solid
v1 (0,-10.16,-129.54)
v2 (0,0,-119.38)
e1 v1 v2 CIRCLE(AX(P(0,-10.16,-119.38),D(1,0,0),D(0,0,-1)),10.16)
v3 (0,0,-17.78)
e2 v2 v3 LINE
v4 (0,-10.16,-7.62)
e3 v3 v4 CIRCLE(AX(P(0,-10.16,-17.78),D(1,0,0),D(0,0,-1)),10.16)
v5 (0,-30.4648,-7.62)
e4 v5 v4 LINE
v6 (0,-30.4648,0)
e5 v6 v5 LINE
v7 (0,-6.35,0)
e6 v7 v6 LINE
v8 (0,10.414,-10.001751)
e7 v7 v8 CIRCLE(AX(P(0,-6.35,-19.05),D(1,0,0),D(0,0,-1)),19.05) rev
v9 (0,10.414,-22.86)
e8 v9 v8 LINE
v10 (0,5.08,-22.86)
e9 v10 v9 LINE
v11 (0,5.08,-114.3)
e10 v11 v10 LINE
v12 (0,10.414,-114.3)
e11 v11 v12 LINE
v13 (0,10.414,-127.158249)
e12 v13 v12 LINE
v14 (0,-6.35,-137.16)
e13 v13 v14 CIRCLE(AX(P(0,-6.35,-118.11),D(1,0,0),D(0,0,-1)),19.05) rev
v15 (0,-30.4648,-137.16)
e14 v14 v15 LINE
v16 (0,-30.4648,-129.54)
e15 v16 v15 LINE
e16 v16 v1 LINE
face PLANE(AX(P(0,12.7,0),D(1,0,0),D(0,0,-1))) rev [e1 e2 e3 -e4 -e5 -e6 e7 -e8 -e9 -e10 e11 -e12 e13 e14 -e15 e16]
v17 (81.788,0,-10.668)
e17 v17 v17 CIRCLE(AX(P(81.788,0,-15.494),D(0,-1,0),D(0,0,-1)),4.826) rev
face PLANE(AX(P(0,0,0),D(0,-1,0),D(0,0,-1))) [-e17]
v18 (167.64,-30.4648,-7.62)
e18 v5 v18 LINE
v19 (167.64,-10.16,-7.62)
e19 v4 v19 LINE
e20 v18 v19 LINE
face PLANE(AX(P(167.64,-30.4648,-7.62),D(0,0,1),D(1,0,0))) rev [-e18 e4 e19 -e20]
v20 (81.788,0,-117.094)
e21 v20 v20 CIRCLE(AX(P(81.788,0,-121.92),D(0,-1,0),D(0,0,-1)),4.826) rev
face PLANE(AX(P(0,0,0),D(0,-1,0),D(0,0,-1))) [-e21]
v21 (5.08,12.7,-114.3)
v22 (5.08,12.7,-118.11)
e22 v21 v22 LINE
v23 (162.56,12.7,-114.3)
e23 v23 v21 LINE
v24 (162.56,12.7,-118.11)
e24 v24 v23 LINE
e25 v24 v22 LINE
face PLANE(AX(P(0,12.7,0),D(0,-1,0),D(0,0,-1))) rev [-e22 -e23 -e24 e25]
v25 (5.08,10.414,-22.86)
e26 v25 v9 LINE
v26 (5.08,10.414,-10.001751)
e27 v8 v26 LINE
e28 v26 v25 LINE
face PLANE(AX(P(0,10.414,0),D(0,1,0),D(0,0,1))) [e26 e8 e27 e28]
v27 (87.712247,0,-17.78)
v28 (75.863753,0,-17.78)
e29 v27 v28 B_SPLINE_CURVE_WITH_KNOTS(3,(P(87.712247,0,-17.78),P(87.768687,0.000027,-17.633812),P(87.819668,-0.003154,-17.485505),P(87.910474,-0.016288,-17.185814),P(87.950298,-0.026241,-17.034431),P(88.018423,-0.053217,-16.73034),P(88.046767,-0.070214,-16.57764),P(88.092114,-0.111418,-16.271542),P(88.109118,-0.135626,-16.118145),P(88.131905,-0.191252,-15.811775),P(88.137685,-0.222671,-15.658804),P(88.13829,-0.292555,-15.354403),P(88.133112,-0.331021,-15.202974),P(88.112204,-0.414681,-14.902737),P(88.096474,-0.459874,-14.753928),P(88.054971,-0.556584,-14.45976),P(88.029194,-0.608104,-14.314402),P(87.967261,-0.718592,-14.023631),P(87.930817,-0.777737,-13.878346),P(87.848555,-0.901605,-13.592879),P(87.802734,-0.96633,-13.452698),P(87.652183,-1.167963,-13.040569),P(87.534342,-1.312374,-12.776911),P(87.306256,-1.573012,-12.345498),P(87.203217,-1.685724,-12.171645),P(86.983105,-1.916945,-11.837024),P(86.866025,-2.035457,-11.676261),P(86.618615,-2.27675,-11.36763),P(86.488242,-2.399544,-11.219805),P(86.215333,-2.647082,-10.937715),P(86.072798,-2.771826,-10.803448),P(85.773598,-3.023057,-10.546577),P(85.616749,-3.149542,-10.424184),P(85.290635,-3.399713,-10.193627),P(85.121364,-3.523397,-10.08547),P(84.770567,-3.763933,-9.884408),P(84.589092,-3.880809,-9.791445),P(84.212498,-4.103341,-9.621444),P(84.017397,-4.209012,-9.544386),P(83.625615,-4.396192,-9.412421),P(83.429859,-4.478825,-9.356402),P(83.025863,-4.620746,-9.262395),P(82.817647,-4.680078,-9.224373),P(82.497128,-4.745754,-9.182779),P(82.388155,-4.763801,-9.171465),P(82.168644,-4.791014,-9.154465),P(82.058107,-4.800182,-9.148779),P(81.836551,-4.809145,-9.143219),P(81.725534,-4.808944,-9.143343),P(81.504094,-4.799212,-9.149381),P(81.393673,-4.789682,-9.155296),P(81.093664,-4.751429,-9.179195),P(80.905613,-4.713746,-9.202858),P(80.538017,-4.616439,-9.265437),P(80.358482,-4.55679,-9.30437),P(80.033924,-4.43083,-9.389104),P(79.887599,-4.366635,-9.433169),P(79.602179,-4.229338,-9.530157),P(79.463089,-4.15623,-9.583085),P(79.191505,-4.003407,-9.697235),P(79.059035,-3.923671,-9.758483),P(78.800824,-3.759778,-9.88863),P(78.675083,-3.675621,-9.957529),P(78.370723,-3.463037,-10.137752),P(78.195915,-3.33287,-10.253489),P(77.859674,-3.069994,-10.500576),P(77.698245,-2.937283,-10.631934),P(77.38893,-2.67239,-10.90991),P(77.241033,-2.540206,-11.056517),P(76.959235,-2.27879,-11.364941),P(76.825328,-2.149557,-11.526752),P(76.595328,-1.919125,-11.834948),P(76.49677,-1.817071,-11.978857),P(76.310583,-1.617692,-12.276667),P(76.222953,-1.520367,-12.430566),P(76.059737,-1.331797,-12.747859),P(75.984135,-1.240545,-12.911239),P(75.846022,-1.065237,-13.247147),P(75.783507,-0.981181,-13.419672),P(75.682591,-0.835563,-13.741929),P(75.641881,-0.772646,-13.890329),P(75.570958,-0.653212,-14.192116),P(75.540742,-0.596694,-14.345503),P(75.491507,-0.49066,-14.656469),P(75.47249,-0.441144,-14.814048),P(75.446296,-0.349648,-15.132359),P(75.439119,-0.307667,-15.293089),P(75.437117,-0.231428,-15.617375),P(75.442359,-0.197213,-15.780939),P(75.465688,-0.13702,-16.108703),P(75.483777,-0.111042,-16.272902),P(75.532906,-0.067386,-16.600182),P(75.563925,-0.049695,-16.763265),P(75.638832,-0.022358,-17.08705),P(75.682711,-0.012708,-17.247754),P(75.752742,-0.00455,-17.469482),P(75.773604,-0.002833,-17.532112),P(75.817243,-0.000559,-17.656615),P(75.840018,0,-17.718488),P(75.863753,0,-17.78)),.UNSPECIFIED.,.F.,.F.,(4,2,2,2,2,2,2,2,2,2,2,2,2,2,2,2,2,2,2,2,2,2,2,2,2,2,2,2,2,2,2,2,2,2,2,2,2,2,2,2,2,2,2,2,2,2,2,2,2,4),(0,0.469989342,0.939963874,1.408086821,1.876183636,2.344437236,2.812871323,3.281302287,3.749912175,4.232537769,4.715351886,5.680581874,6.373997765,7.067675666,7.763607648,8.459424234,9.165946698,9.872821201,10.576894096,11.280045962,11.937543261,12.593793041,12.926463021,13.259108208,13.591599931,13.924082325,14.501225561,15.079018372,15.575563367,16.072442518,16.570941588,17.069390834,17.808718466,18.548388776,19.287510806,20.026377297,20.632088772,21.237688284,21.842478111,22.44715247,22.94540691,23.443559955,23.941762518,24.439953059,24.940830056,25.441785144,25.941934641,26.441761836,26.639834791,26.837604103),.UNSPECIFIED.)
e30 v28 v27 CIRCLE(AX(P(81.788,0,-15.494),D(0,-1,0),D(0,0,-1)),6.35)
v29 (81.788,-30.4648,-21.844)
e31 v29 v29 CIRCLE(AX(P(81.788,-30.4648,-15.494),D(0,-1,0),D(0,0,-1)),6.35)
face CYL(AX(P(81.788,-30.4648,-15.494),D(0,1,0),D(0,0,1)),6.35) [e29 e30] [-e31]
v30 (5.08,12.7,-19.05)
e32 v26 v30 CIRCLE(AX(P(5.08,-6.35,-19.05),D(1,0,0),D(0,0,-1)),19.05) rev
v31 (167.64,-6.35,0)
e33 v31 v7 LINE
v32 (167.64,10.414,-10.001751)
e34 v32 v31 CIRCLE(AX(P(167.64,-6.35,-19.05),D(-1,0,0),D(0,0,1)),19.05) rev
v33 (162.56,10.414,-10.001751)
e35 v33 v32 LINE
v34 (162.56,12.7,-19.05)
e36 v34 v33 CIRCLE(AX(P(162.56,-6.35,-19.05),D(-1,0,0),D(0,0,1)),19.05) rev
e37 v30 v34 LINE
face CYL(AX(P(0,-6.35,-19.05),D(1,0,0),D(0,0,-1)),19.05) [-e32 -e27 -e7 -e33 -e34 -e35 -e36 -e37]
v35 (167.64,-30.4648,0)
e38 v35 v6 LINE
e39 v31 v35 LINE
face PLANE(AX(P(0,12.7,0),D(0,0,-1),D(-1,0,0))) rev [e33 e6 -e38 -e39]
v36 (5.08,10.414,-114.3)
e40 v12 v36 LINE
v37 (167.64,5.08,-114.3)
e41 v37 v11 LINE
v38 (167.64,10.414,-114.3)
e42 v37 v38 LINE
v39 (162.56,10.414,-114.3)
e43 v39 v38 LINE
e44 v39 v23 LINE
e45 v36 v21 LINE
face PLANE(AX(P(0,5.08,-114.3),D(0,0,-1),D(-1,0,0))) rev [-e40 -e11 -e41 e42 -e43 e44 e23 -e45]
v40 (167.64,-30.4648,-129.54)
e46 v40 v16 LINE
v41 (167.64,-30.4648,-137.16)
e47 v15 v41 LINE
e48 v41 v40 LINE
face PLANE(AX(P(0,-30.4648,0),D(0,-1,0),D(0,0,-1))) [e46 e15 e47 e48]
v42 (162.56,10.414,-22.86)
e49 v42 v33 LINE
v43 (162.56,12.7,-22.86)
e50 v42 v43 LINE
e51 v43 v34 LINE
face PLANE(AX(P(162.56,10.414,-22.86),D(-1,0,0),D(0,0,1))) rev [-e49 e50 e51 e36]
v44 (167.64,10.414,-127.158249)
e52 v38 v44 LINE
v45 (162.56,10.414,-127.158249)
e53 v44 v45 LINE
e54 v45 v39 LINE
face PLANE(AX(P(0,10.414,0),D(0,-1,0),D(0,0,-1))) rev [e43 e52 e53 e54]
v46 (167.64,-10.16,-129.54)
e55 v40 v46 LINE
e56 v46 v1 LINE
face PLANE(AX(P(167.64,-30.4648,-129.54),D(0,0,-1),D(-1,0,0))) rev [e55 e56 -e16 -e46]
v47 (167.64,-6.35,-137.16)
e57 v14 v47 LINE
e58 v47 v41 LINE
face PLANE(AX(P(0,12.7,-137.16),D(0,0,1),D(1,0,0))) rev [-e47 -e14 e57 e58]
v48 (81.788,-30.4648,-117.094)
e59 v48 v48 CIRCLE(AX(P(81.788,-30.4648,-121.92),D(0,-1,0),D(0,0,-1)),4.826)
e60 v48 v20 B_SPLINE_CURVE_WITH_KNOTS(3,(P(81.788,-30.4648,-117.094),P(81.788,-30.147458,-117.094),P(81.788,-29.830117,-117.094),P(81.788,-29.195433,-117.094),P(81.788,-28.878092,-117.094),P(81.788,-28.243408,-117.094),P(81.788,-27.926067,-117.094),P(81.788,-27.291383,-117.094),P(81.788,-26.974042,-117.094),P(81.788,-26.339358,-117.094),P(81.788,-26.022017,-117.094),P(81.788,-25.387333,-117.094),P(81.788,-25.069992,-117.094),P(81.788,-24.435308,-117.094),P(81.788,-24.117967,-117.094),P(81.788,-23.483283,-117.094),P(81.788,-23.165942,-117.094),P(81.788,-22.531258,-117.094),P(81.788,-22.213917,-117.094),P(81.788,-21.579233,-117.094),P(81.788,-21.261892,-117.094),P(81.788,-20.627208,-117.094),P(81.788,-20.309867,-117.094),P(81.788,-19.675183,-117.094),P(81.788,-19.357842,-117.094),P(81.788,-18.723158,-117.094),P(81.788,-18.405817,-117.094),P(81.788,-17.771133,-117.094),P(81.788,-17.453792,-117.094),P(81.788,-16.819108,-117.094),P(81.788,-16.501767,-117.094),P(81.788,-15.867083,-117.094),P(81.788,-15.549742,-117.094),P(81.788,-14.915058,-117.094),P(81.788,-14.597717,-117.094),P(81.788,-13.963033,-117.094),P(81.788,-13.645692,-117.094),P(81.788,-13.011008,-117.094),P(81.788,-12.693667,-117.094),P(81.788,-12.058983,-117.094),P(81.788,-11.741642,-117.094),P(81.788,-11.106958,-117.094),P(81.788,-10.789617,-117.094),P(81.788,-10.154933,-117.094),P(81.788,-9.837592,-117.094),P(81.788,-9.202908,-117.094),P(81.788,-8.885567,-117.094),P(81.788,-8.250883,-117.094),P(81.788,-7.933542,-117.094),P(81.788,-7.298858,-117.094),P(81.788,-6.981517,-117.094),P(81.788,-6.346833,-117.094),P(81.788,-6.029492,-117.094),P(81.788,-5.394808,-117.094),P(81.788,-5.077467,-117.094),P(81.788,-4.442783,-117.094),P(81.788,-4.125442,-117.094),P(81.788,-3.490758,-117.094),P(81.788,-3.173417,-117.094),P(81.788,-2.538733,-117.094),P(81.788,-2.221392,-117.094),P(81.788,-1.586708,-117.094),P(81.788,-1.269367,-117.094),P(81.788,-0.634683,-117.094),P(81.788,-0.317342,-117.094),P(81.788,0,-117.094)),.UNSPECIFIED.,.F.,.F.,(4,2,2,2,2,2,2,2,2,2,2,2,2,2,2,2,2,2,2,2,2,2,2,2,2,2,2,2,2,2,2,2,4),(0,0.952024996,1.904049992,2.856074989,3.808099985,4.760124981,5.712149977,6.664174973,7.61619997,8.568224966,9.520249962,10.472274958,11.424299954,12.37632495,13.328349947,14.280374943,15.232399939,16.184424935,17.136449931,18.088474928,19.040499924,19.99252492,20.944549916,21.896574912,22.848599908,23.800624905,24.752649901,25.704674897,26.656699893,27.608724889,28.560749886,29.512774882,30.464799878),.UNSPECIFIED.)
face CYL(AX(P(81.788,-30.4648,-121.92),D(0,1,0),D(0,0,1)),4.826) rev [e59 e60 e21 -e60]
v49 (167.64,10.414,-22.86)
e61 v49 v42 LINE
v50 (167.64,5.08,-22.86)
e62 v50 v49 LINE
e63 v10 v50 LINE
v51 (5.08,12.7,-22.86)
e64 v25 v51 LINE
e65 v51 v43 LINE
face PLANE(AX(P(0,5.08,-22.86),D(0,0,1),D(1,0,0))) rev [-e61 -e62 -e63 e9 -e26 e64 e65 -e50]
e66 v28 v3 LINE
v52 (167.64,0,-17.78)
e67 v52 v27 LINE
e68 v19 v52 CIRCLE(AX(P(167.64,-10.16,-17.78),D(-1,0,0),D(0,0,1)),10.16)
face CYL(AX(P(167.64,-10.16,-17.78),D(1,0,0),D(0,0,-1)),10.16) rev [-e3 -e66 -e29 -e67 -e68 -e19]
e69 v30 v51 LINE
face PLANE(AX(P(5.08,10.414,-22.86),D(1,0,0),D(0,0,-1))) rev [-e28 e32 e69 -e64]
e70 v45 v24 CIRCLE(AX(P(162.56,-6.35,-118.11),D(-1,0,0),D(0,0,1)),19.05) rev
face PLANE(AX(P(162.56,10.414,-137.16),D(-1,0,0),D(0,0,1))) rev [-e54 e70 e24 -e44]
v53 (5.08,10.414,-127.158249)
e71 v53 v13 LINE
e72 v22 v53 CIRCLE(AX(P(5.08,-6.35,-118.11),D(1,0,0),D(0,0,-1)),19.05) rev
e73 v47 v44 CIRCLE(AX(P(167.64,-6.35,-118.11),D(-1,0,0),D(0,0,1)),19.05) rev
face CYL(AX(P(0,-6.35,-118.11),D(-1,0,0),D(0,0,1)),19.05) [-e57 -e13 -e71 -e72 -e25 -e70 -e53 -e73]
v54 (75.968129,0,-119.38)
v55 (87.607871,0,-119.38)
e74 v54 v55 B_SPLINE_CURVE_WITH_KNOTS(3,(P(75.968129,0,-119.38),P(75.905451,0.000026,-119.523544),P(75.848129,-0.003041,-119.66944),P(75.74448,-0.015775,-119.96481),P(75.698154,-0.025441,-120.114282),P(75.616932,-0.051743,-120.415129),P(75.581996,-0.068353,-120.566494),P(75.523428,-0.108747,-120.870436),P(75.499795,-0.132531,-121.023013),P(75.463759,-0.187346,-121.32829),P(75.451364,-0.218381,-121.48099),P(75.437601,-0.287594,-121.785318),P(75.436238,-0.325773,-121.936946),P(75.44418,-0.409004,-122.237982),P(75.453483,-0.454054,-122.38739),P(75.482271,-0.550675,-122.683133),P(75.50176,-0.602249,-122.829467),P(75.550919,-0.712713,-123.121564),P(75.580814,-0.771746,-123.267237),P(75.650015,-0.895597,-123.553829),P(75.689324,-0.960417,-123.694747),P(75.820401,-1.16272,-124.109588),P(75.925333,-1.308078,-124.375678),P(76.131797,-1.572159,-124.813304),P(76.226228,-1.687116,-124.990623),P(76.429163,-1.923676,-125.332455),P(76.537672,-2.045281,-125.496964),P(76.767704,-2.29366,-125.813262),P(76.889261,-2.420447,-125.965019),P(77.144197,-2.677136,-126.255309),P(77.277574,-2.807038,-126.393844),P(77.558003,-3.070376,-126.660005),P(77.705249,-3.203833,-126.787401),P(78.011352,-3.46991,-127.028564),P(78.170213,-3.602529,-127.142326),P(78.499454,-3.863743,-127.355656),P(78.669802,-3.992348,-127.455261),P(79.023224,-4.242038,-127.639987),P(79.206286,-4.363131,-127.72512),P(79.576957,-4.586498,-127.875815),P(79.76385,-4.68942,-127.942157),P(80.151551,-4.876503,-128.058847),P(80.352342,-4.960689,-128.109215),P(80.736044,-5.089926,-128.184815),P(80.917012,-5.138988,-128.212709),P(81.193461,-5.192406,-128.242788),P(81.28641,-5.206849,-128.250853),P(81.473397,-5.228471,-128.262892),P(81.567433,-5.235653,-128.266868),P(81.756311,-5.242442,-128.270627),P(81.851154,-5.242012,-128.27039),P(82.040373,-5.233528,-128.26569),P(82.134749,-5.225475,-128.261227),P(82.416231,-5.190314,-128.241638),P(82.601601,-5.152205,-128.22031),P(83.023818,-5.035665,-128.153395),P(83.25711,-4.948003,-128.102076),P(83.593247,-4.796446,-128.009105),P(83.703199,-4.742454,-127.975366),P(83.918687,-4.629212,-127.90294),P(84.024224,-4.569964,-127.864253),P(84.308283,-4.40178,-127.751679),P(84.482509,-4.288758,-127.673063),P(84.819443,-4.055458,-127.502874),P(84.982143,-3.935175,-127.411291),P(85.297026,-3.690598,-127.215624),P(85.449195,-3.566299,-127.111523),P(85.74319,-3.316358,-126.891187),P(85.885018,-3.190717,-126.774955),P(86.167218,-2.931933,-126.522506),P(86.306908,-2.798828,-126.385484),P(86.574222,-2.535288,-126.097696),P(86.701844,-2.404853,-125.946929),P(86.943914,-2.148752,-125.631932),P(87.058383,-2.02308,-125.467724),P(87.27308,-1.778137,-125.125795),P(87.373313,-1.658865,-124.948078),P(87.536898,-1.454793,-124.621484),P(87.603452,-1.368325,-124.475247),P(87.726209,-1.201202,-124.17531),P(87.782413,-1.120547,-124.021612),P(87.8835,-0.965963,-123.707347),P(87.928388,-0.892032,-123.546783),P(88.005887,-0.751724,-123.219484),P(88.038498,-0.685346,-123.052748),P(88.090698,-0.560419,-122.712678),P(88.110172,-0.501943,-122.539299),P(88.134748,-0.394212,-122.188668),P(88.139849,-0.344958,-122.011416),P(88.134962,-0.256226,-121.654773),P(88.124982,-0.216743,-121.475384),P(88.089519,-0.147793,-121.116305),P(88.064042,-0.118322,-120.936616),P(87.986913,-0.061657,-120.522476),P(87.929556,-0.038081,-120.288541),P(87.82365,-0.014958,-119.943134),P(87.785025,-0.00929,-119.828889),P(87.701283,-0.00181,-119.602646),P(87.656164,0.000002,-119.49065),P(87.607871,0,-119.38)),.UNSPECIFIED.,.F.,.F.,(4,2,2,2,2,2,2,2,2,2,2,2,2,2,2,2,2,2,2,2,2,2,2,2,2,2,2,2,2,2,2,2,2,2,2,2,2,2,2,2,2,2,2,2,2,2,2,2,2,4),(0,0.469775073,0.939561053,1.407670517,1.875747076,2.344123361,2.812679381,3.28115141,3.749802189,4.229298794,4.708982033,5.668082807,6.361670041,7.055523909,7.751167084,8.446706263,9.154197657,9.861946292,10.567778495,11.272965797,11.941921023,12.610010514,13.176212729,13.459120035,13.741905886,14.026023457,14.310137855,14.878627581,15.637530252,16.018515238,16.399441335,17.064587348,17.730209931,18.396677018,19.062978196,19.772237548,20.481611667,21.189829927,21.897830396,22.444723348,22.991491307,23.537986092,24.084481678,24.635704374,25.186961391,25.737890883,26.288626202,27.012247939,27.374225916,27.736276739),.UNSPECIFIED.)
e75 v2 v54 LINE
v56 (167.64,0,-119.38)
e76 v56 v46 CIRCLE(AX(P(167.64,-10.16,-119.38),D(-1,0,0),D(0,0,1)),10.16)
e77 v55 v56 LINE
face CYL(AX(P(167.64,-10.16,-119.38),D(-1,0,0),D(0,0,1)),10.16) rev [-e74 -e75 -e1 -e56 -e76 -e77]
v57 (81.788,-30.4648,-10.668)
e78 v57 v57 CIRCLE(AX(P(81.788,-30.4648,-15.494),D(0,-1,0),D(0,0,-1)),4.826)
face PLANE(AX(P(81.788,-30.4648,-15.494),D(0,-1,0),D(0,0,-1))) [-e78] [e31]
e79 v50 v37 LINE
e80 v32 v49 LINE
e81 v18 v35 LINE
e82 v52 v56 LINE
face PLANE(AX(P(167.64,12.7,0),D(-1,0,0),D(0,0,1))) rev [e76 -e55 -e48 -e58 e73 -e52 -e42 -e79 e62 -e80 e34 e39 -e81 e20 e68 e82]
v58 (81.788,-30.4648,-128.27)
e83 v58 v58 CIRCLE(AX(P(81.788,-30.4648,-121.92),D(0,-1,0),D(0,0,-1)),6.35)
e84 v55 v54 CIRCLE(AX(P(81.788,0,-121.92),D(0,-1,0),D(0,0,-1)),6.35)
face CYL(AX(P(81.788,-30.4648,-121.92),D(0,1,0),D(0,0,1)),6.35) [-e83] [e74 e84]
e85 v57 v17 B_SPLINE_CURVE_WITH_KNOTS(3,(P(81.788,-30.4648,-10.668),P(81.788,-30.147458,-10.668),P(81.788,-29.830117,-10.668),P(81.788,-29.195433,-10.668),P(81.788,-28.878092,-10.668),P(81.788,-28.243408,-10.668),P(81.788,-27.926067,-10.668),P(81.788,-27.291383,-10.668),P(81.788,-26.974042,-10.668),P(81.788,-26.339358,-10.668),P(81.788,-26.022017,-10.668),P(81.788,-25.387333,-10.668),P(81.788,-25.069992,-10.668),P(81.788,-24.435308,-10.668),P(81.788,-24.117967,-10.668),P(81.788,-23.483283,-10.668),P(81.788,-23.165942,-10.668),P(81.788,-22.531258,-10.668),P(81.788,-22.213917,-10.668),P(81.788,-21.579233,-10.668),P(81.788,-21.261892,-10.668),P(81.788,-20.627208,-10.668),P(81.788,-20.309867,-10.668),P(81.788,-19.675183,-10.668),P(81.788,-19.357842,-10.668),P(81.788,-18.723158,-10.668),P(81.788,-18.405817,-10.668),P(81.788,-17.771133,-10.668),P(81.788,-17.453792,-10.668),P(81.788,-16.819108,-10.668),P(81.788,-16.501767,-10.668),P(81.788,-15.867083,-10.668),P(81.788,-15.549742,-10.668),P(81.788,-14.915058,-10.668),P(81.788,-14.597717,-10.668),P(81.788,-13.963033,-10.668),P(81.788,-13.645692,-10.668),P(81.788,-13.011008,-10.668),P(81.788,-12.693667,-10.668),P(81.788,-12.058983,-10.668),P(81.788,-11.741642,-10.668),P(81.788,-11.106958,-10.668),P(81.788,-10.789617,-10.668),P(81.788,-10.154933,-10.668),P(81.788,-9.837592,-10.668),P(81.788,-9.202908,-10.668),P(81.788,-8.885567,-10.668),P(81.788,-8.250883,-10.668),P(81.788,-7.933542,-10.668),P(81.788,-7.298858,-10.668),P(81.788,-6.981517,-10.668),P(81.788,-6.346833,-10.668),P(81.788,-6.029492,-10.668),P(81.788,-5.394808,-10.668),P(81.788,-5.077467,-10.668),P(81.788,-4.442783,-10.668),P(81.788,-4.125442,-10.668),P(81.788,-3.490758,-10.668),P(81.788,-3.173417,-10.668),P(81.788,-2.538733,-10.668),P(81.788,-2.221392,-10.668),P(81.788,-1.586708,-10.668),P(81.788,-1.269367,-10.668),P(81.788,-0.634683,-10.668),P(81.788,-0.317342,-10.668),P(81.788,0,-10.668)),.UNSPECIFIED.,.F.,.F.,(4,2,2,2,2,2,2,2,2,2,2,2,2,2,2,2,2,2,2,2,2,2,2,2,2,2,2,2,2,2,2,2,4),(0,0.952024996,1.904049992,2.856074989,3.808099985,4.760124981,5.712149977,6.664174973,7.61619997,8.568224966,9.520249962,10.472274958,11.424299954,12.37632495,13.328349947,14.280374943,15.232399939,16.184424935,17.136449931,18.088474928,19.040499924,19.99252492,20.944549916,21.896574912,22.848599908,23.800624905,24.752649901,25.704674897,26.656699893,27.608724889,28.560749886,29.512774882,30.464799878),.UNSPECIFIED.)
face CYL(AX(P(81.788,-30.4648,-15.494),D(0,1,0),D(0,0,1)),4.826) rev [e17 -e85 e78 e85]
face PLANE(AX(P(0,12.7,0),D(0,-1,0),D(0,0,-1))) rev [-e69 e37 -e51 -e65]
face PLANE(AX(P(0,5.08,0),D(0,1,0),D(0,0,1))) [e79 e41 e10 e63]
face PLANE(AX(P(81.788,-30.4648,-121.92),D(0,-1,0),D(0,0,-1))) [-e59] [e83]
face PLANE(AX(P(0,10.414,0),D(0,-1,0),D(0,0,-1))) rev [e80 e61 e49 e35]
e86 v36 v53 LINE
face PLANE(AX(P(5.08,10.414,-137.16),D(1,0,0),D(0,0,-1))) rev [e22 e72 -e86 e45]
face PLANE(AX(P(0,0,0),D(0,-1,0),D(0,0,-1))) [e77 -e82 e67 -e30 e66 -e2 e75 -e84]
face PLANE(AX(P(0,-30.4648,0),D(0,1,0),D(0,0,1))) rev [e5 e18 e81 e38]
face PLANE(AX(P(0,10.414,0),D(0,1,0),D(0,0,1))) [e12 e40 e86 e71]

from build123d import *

# Parameters (mm, degrees)
SKETCH1_W           = 167.64
SKETCH1_H           = 137.16
BOSS_EXTRUDE1_DEPTH = 12.7
SKETCH2_W           = 167.64
SKETCH2_H           = 91.44
CUT_EXTRUDE1_DEPTH  = 7.62
SKETCH3_W           = 5.08
SKETCH3_H           = 22.86
CUT_EXTRUDE2_DEPTH  = 2.286
SKETCH4_R           = 6.35
SKETCH4_R_2         = 4.826
BOSS_EXTRUDE2_DEPTH = 30.464799878
SKETCH5_W           = 167.64
SKETCH5_H           = 7.62
BOSS_EXTRUDE3_DEPTH = 30.464799878
FILLET1_R           = 19.05
FILLET2_R           = 10.16


with BuildPart() as part:
    # Sketch1 → Boss-Extrude1 (new body)
    with BuildSketch(Plane(origin=(0, 0, 0), x_dir=(1, 0, 0), z_dir=(0, 1, 0))):
        with Locations((83.82, 68.58)):
            Rectangle(SKETCH1_W, SKETCH1_H)
    extrude(amount=BOSS_EXTRUDE1_DEPTH)

    # Sketch2 → Cut-Extrude1 (cut)
    with BuildSketch(Plane(origin=(0, 12.7, 0), x_dir=(1, 0, 0), z_dir=(0, 1, 0))):
        with Locations((83.82, 68.58)):
            Rectangle(SKETCH2_W, SKETCH2_H)
    extrude(amount=-CUT_EXTRUDE1_DEPTH, mode=Mode.SUBTRACT)

    # Sketch3 → Cut-Extrude2 (cut)
    with BuildSketch(Plane(origin=(0, 12.7, 0), x_dir=(1, 0, 0), z_dir=(0, 1, 0))):
        with Locations((2.54, 125.73)):
            Rectangle(SKETCH3_W, SKETCH3_H)
        with Locations((165.1, 125.73)):
            Rectangle(SKETCH3_W, SKETCH3_H)
        with Locations((165.1, 11.43)):
            Rectangle(SKETCH3_W, SKETCH3_H)
        with Locations((2.54, 11.43)):
            Rectangle(SKETCH3_W, SKETCH3_H)
    extrude(amount=-CUT_EXTRUDE2_DEPTH, mode=Mode.SUBTRACT)

    # Sketch4 → Boss-Extrude2 (add)
    # profile 1 of 2: a face of its own
    with BuildSketch(Plane.XZ):
        with Locations(Location((81.788, -15.494, 0), (0, 0, 90))):
            Circle(SKETCH4_R)
        with Locations(Location((81.788, -15.494, 0), (0, 0, 90))):
            Circle(SKETCH4_R_2, mode=Mode.SUBTRACT)
    # profile 2 of 2: a face of its own
    with BuildSketch(Plane.XZ):
        with Locations(Location((81.788, -121.92, 0), (0, 0, 90))):
            Circle(SKETCH4_R)
        with Locations(Location((81.788, -121.92, 0), (0, 0, 90))):
            Circle(SKETCH4_R_2, mode=Mode.SUBTRACT)
    extrude(amount=BOSS_EXTRUDE2_DEPTH)

    # Sketch5 → Boss-Extrude3 (add)
    with BuildSketch(Plane.XZ):
        with Locations((83.82, -133.35)):
            Rectangle(SKETCH5_W, SKETCH5_H)
        with Locations((83.82, -3.81)):
            Rectangle(SKETCH5_W, SKETCH5_H)
    extrude(amount=BOSS_EXTRUDE3_DEPTH)

    # Fillet1
    fillet1_edges = [part.edges().sort_by_distance(p)[0] for p in [
        (83.82, 12.7, 0),
        (83.82, 12.7, -137.16),
    ]]
    fillet(fillet1_edges, radius=FILLET1_R)

    # Fillet2
    # the kernel refuses this fillet: 10.16 mm, written as the material it adds along each edge
    with BuildSketch(Plane(origin=(0, 0, -7.62), x_dir=(0, -1, 0), z_dir=(1, 0, 0))) as fillet2_piece_1_section:
        with BuildLine():
            CenterArc((FILLET2_R, FILLET2_R), FILLET2_R, 180, 90)
            Line((0, FILLET2_R), (0, 0))
            Line((0, 0), (FILLET2_R, 0))
        make_face()
    fillet2_piece_1 = extrude(amount=167.64, mode=Mode.PRIVATE)
    fillet2_piece_1 = fillet2_piece_1 - Plane(origin=(81.788, -7.490679749, -15.494), x_dir=(0, 0, 1), z_dir=(0, 1, 0)) * Cylinder(4.826, 376, mode=Mode.PRIVATE)
    add(fillet2_piece_1)
    with BuildSketch(Plane(origin=(0, 0, -129.54), x_dir=(0, 0, 1), z_dir=(1, 0, 0))) as fillet2_piece_2_section:
        with BuildLine():
            CenterArc((FILLET2_R, FILLET2_R), FILLET2_R, 180, 90)
            Line((0, FILLET2_R), (0, 0))
            Line((0, 0), (FILLET2_R, 0))
        make_face()
    fillet2_piece_2 = extrude(amount=167.64, mode=Mode.PRIVATE)
    fillet2_piece_2 = fillet2_piece_2 - Plane(origin=(81.788, -0.198114481, -121.92), x_dir=(0, 0, 1), z_dir=(0, 1, 0)) * Cylinder(4.826, 376, mode=Mode.PRIVATE)
    add(fillet2_piece_2)


solid = part.part
